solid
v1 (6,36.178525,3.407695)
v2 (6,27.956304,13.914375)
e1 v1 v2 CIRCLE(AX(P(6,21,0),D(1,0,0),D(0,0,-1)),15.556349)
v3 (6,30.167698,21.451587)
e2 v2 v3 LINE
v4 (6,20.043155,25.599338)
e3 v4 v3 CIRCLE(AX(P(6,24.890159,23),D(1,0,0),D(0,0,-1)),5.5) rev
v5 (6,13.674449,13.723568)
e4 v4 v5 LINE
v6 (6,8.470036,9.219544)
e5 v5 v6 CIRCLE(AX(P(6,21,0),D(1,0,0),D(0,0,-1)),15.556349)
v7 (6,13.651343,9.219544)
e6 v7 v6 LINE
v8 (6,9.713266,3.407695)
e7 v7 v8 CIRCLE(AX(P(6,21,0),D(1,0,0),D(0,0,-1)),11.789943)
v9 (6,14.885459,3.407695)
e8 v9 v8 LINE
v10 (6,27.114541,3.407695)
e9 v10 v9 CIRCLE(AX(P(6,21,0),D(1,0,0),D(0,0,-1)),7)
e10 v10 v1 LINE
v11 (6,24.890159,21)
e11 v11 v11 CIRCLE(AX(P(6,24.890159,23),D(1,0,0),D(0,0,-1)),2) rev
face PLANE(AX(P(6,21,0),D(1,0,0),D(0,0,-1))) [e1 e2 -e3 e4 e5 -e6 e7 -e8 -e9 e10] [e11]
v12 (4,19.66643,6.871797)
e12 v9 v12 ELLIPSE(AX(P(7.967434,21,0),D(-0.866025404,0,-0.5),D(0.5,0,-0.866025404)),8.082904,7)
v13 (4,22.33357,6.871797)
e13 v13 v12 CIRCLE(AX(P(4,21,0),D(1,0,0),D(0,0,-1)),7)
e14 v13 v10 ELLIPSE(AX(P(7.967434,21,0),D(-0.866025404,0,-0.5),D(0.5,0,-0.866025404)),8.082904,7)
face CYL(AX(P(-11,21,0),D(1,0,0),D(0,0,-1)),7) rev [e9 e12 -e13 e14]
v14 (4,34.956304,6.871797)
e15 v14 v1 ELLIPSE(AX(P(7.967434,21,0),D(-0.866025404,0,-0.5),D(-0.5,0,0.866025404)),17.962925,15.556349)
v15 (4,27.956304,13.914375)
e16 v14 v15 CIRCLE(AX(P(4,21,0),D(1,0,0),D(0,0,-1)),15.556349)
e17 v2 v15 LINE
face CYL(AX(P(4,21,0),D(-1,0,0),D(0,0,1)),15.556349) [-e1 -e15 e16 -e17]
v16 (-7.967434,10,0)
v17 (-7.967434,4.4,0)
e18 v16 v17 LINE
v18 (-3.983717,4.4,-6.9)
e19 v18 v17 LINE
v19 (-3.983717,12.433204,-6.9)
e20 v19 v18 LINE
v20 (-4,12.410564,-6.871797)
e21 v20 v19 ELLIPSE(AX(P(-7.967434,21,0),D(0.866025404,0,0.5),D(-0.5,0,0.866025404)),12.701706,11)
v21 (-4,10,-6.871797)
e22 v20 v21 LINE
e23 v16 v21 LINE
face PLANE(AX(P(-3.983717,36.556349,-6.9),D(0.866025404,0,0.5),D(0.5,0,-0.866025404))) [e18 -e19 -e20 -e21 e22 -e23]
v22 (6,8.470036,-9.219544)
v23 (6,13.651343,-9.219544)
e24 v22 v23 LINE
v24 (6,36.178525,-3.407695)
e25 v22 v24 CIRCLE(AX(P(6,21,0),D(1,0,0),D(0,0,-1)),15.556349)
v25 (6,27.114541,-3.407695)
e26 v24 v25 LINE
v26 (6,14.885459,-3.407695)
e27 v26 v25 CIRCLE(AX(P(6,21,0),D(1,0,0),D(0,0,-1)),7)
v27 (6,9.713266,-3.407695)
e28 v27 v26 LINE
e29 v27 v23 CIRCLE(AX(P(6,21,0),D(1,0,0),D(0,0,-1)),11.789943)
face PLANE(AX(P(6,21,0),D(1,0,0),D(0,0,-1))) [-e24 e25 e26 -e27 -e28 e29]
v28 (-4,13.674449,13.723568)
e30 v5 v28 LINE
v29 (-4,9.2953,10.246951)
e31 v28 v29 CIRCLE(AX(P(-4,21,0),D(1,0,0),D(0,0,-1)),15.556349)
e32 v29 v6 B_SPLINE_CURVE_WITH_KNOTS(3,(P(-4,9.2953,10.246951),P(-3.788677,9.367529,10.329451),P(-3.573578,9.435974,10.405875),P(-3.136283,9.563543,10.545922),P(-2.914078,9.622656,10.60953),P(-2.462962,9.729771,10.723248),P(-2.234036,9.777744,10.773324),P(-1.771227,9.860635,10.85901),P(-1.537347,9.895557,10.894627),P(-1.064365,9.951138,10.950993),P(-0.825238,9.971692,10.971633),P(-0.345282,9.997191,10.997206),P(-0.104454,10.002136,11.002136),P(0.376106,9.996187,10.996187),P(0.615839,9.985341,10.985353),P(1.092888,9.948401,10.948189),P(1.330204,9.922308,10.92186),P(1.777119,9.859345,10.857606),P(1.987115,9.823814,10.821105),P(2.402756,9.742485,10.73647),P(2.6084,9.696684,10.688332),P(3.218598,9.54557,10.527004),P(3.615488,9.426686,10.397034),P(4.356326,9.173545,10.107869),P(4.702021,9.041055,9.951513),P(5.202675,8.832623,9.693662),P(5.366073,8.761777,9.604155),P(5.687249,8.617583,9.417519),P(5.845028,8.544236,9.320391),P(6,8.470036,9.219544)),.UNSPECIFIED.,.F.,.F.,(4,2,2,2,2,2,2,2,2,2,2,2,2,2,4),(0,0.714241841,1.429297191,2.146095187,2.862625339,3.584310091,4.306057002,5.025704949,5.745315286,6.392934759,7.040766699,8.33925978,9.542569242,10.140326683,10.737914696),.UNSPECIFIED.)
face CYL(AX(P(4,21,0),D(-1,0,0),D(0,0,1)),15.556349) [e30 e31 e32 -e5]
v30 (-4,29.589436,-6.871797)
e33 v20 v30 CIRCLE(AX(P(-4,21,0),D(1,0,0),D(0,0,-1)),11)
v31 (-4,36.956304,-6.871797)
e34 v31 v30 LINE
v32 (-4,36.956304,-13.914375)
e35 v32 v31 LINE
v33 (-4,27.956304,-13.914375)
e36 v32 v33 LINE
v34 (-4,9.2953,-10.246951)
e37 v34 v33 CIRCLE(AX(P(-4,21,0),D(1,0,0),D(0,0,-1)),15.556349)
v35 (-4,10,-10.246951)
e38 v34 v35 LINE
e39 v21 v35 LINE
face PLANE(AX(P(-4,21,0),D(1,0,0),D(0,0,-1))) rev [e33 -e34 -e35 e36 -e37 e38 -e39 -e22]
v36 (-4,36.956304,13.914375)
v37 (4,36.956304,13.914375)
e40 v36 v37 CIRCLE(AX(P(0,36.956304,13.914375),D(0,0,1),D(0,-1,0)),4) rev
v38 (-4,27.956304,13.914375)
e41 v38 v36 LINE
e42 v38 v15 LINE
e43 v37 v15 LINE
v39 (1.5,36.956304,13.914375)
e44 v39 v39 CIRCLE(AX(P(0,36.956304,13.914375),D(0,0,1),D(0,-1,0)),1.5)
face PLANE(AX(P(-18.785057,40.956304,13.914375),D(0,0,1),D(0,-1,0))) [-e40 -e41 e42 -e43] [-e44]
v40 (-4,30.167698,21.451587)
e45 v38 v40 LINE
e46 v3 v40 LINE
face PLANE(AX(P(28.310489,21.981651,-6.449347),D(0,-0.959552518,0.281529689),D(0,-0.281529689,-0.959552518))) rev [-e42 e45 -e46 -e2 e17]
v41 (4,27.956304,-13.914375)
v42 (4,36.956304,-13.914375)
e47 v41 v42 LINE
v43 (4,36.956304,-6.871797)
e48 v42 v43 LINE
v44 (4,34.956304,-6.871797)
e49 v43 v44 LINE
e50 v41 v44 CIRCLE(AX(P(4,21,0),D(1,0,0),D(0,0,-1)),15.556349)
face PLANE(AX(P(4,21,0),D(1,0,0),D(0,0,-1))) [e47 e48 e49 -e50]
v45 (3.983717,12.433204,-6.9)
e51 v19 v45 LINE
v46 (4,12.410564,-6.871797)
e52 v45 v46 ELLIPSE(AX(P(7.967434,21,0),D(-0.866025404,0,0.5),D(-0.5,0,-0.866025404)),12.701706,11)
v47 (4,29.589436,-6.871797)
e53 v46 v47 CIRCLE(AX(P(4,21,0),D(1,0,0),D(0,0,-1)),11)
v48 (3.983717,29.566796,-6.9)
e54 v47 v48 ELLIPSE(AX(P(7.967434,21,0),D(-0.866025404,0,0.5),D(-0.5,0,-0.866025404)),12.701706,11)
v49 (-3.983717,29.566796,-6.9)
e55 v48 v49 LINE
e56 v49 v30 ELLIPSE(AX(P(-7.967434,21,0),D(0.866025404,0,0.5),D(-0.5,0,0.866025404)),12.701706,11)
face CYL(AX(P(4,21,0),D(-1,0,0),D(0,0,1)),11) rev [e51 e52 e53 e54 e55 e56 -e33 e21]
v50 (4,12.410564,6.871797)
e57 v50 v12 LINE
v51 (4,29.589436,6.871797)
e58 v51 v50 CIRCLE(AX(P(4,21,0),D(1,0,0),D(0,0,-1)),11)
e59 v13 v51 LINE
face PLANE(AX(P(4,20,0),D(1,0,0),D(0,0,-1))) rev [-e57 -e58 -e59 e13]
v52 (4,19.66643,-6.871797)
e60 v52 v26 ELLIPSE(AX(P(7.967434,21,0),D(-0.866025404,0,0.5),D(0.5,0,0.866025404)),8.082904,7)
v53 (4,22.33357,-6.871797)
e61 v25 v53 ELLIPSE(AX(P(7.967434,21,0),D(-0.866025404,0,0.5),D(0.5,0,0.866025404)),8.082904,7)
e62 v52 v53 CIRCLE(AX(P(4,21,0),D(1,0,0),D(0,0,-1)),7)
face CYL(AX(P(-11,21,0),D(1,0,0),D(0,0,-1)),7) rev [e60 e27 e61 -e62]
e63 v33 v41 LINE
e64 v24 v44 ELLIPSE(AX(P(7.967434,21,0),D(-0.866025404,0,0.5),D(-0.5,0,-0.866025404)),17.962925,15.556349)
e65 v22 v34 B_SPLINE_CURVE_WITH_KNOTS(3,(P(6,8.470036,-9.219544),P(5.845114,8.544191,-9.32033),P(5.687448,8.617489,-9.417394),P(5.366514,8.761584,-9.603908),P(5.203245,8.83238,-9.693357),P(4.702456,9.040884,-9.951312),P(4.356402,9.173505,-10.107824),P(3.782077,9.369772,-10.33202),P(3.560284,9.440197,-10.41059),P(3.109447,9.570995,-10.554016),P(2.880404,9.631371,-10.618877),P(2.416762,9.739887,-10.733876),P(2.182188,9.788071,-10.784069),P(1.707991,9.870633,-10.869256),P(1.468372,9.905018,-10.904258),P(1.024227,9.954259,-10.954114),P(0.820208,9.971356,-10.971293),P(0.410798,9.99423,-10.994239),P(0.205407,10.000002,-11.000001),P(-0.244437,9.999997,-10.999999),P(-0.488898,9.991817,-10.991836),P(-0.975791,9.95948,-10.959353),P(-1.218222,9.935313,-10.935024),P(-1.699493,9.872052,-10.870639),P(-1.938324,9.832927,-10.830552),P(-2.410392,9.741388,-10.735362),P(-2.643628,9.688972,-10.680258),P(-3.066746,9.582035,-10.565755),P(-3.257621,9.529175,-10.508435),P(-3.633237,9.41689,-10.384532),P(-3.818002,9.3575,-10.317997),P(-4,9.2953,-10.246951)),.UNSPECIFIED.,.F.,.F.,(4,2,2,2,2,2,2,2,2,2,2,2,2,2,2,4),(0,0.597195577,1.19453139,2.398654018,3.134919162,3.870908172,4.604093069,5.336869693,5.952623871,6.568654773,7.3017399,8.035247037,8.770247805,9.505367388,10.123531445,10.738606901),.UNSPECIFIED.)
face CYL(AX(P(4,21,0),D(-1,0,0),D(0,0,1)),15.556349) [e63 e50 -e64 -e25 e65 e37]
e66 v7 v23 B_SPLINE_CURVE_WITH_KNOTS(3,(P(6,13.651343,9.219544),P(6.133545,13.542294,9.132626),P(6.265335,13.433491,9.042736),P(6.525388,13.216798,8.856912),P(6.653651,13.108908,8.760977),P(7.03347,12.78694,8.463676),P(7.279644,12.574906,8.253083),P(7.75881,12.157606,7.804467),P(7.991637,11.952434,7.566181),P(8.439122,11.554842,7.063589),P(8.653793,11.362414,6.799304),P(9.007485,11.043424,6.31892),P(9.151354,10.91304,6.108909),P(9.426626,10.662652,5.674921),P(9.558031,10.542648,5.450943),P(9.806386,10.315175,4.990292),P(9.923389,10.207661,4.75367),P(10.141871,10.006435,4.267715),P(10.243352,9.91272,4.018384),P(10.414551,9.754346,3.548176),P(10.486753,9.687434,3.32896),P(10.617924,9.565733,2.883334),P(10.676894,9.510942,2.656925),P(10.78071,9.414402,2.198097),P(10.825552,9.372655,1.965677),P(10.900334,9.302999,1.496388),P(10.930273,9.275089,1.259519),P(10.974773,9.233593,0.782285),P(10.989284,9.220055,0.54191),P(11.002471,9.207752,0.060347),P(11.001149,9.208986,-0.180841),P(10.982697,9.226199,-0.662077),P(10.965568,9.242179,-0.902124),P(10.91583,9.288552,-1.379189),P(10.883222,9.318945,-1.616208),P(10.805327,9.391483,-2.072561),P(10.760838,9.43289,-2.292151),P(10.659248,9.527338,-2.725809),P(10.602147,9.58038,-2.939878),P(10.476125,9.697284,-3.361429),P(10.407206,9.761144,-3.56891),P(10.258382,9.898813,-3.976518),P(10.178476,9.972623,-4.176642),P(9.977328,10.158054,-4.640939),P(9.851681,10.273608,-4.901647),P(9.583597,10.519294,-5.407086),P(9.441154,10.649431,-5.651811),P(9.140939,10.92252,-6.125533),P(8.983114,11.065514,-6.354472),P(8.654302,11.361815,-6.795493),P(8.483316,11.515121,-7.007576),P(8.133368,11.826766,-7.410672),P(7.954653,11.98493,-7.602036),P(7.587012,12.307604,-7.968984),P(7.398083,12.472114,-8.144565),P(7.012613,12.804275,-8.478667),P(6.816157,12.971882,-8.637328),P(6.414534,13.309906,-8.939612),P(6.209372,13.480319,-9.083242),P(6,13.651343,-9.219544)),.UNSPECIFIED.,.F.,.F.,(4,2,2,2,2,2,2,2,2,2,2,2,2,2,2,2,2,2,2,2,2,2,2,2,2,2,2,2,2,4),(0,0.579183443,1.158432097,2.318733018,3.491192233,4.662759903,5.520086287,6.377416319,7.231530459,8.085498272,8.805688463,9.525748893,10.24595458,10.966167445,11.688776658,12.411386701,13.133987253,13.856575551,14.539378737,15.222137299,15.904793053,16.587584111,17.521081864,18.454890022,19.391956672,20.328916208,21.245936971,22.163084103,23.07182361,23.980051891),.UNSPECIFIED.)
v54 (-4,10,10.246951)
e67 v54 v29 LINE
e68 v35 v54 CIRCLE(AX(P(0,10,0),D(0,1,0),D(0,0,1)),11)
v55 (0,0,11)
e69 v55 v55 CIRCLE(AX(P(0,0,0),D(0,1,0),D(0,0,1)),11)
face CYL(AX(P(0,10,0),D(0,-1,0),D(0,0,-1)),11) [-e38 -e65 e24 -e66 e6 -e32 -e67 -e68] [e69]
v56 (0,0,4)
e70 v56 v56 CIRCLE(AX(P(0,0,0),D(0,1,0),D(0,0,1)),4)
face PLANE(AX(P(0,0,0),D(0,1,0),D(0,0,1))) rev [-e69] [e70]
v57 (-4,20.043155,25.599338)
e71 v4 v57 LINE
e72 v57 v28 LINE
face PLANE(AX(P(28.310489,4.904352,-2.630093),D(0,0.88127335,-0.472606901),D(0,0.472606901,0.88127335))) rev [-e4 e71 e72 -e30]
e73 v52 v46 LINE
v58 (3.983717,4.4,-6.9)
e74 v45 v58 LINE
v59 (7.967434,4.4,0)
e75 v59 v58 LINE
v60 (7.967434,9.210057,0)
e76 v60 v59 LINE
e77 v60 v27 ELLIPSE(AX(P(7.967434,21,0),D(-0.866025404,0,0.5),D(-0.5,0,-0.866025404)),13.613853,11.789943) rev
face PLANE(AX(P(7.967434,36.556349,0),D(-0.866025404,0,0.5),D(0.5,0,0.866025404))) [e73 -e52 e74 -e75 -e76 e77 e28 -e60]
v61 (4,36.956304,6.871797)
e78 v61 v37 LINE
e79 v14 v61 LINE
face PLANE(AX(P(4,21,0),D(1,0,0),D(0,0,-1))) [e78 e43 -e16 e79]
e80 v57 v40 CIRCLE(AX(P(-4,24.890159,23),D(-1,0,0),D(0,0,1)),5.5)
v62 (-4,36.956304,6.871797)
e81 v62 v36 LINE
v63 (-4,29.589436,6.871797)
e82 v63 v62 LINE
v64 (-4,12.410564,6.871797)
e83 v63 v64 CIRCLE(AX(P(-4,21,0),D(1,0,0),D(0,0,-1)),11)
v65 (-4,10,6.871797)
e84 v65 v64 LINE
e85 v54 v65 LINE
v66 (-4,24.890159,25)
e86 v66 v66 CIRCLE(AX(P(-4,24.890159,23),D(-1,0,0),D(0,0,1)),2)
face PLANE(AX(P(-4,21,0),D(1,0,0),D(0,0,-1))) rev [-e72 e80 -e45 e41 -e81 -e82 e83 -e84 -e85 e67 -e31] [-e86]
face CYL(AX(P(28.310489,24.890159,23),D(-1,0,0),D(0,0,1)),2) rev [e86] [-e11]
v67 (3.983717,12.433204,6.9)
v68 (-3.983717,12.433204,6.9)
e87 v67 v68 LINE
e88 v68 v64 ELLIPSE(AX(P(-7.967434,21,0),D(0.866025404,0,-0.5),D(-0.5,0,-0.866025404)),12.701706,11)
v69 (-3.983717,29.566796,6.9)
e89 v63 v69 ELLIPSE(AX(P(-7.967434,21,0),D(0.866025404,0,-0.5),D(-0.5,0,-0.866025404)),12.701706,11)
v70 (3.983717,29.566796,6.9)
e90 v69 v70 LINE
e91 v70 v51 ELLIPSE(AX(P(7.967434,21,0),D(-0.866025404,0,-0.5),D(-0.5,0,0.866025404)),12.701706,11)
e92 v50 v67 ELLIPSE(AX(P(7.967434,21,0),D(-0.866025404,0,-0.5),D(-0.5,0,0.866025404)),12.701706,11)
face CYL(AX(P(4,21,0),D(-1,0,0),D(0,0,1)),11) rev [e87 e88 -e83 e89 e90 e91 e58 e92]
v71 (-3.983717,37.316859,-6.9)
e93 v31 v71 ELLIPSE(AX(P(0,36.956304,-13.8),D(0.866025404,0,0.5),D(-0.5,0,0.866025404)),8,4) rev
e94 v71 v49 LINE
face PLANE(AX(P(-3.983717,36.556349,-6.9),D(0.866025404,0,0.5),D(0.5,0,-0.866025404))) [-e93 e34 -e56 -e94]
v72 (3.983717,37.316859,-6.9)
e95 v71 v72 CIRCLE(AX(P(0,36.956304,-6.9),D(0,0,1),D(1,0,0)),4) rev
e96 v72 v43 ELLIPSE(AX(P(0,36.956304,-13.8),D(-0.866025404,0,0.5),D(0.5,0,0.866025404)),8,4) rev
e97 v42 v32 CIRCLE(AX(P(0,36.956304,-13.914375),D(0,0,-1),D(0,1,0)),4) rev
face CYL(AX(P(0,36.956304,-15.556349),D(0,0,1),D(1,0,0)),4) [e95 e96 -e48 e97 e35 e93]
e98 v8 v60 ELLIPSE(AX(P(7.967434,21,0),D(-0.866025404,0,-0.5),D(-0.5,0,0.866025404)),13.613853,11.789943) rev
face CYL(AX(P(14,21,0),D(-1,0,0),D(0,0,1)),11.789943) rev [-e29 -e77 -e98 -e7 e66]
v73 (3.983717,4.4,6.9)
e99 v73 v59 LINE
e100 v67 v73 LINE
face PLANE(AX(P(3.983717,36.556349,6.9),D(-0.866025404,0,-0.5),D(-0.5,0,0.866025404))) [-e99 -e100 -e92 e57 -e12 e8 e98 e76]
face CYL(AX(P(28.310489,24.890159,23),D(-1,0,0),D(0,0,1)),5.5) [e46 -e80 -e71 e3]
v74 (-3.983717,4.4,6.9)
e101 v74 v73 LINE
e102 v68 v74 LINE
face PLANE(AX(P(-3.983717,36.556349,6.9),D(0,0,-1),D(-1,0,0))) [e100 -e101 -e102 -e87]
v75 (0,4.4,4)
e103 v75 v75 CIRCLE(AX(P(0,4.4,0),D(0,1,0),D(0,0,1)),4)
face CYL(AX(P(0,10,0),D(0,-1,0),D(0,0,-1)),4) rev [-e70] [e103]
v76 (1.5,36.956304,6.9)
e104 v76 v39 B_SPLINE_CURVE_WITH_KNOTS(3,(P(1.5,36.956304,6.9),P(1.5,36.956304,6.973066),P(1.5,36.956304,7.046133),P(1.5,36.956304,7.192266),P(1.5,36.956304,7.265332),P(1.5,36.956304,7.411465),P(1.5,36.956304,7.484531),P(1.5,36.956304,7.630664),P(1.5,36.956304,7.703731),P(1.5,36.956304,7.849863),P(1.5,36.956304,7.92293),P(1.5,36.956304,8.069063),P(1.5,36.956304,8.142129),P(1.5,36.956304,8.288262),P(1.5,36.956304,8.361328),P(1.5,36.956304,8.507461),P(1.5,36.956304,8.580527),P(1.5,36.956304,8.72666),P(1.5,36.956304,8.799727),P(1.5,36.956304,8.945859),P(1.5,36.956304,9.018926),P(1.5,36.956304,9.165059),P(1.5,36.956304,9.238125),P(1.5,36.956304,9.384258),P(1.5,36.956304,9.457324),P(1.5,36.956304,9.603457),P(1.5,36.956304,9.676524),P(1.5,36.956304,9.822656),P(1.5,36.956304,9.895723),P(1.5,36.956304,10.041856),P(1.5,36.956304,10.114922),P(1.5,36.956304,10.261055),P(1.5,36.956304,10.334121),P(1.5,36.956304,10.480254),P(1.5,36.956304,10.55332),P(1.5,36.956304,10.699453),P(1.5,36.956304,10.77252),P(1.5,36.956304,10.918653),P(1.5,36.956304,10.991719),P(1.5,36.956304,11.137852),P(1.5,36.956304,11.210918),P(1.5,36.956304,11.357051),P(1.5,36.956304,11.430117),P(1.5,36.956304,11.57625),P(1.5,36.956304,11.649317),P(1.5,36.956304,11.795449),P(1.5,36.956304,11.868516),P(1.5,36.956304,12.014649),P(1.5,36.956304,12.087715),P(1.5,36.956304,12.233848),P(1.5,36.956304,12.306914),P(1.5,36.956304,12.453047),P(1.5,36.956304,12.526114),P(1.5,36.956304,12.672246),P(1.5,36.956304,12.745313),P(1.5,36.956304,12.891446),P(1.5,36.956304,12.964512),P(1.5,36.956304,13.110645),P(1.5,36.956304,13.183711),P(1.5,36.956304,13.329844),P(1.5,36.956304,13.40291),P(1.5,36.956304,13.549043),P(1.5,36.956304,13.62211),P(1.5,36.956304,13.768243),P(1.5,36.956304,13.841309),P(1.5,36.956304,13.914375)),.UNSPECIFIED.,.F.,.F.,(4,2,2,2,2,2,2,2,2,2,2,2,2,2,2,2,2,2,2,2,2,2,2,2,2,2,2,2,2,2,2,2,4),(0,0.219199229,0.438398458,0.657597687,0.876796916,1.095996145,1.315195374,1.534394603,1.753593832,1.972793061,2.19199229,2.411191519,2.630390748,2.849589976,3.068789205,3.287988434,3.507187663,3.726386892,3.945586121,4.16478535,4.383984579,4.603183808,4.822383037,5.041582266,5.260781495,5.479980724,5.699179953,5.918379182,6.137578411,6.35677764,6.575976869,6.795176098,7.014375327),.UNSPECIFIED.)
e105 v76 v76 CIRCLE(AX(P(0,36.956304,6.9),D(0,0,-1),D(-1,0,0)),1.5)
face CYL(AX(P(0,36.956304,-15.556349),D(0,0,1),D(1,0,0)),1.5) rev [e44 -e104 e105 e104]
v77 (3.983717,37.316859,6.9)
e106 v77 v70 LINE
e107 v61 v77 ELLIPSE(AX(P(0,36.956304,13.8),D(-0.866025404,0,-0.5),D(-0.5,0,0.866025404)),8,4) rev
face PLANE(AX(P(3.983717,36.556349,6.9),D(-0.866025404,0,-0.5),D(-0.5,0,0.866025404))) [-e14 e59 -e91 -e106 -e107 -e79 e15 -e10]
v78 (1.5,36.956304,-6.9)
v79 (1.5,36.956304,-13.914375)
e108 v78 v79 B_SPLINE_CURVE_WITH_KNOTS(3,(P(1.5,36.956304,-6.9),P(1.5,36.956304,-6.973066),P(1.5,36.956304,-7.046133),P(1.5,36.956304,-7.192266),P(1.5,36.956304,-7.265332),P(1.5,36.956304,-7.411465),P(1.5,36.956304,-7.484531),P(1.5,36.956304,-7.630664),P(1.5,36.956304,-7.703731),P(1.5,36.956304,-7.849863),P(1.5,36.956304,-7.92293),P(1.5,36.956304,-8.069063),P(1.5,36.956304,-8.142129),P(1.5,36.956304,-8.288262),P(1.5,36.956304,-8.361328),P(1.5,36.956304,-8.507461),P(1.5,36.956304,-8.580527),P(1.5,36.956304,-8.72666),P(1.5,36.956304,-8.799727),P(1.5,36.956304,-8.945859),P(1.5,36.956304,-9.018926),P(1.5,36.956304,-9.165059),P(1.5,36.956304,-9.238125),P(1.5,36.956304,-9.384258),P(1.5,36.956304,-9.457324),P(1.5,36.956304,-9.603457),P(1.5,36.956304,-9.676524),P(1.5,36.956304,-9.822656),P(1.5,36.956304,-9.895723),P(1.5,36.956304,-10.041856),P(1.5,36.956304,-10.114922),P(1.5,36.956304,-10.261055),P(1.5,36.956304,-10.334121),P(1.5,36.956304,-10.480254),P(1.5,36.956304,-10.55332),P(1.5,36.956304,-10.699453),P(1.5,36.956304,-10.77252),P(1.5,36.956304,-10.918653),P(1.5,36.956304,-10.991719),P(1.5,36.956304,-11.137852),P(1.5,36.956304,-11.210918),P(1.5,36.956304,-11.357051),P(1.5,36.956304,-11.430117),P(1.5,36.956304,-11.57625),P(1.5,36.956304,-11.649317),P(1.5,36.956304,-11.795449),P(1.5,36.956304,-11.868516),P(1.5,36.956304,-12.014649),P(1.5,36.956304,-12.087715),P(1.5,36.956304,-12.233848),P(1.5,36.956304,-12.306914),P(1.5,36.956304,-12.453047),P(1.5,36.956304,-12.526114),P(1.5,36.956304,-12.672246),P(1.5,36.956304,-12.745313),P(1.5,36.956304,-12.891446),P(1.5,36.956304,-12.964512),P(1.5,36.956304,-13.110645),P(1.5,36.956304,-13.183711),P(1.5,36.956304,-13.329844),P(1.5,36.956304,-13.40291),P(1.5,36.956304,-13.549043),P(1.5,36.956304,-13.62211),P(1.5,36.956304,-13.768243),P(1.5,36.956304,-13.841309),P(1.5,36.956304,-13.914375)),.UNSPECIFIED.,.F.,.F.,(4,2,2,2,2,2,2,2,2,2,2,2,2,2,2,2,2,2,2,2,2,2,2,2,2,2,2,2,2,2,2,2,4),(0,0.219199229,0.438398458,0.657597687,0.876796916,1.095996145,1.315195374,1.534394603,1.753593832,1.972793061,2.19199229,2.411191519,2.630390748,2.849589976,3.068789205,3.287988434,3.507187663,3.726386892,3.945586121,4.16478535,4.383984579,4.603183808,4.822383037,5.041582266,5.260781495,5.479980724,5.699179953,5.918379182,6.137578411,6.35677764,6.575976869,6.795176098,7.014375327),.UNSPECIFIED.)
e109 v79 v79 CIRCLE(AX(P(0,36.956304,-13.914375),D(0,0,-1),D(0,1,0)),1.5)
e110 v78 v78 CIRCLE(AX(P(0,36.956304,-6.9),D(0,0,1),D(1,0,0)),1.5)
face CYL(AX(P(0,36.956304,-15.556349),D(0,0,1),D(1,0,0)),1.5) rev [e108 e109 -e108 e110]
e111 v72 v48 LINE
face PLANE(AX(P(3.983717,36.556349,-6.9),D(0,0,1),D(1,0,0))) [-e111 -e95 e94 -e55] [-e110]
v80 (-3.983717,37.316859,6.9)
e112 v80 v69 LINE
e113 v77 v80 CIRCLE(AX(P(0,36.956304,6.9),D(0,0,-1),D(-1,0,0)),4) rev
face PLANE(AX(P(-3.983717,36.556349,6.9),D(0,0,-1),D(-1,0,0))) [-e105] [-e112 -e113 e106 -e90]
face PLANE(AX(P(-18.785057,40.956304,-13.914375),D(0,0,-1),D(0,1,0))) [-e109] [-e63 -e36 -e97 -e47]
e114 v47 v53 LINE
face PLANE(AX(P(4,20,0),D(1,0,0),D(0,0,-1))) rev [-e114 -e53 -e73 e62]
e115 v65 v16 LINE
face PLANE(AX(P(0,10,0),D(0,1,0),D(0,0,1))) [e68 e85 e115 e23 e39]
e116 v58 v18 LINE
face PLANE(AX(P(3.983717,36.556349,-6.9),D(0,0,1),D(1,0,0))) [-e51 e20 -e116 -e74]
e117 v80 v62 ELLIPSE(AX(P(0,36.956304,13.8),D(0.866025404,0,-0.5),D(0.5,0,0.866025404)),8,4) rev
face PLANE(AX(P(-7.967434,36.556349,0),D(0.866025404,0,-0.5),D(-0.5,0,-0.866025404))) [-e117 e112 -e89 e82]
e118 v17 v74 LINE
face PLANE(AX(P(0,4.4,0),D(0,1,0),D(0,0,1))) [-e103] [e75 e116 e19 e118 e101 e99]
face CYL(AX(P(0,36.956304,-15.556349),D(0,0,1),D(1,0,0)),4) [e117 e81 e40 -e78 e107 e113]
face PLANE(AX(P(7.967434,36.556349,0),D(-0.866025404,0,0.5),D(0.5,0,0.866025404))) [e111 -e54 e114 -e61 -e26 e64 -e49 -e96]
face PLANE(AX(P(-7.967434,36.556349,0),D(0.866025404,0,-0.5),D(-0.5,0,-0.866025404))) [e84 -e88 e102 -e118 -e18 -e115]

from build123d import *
from build123d.topology import SkipClean

# Parameters (mm, degrees)
SKETCH1_R               = 11
SKETCH1_R_2             = 4
BOSS_EXTRUDE1_DEPTH     = 10
SKETCH3_R               = 15.556349186
SKETCH3_R_2             = 11
BOSS_EXTRUDE2_DEPTH     = 4
CUT_EXTRUDE1_DEPTH      = 33.68393631
CUT_EXTRUDE1_DEPTH_BACK = 5.6
BOSS_EXTRUDE4_DEPTH     = 10
BOSS_EXTRUDE3_DEPTH     = 8
BOSS_EXTRUDE5_START     = 4
SKETCH3_2_R             = 15.556349186
SKETCH3_2_R_2           = 11
BOSS_EXTRUDE5_DEPTH     = 2
CUT_EXTRUDE2_DEPTH      = 37.349590584
CUT_EXTRUDE2_DEPTH_BACK = 5.6
CUT_EXTRUDE3_DEPTH      = 47.993816701
CUT_EXTRUDE3_DEPTH_BACK = 47.993816701
SKETCH13_R              = 7
CUT_EXTRUDE5_DEPTH      = 52.642447787
CUT_EXTRUDE5_DEPTH_BACK = 52.642447787
SKETCH14_R              = 1.5
SKETCH15_R              = 11.789942891
CUT_EXTRUDE6_DEPTH      = 8
BOSS_EXTRUDE6_REACH     = 48.308
SKETCH16_R              = 2


with BuildPart() as part:
    # Sketch1 → Boss-Extrude1 (new body)
    with BuildSketch(Plane(origin=(0, 0, 0), x_dir=(1, 0, 0), z_dir=(0, 1, 0))):
        with Locations(Location((0, 0, 0), (0, 0, 270))):
            Circle(SKETCH1_R)
        with Locations(Location((0, 0, 0), (0, 0, 270))):
            Circle(SKETCH1_R_2, mode=Mode.SUBTRACT)
    extrude(amount=BOSS_EXTRUDE1_DEPTH)

    # Sketch3 → Boss-Extrude2 (add, symmetric)
    with BuildSketch(Plane(origin=(0, 0, 0), x_dir=(0, 0, -1), z_dir=(1, 0, 0))):
        with Locations((0, 21)):
            Circle(SKETCH3_R)
        with Locations(Location((0, 21, 0), (0, 0, 270))):
            Circle(SKETCH3_R_2, mode=Mode.SUBTRACT)
    extrude(amount=BOSS_EXTRUDE2_DEPTH, both=True)

    # Sketch2 → Cut-Extrude1 (cut, two sides: drawn at the far end of the back side and taken through both)
    with BuildSketch(Plane(origin=(0, 10, 0), x_dir=(1, 0, 0), z_dir=(0, 1, 0)).offset(-CUT_EXTRUDE1_DEPTH_BACK)):
        Polygon((3.983716857, 6.9), (-3.983716857, 6.9), (-7.967433715, 0), (-3.983716857, -6.9), (3.983716857, -6.9), (7.967433715, 0), align=None)
    extrude(amount=CUT_EXTRUDE1_DEPTH + CUT_EXTRUDE1_DEPTH_BACK, mode=Mode.SUBTRACT)

    # Sketch9 → Boss-Extrude4 (add)
    with BuildSketch(Plane(origin=(0, 10, 0), x_dir=(1, 0, 0), z_dir=(0, 1, 0))):
        with BuildLine():
            ThreePointArc((4, -10.246950766), (11, 0), (4, 10.246950766))
            Line((4, 10.246950766), (4, 6.87179677))
            Line((4, 6.87179677), (7.967433715, 0))
            Line((7.967433715, 0), (4, -6.87179677))
            Line((4, -6.87179677), (4, -10.246950766))
        make_face()
    extrude(amount=BOSS_EXTRUDE4_DEPTH)

    # Sketch4 → Boss-Extrude3 (add)
    with BuildSketch(Plane(origin=(4, 0, 0), x_dir=(0, 0, -1), z_dir=(1, 0, 0))):
        with BuildLine():
            Line((-6.87179677, 34.956303563), (-6.87179677, 40.956303563))
            Line((-6.87179677, 40.956303563), (-13.914375327, 40.956303563))
            Line((-13.914375327, 40.956303563), (-13.914375327, 27.956303563))
            ThreePointArc((-13.914375327, 27.956303563), (-10.966596446, 32.033302425), (-6.87179677, 34.956303563))
        make_face()
        with BuildLine():
            Line((6.87179677, 34.956303563), (6.87179677, 40.956303563))
            Line((6.87179677, 40.956303563), (13.914375327, 40.956303563))
            Line((13.914375327, 40.956303563), (13.914375327, 27.956303563))
            ThreePointArc((13.914375327, 27.956303563), (10.966596446, 32.033302425), (6.87179677, 34.956303563))
        make_face()
    extrude(amount=-BOSS_EXTRUDE3_DEPTH)

    # Sketch3<2> → Boss-Extrude5 (add)
    # profile 1 of 2: a face of its own
    with SkipClean():  # the faces are left unmerged after this step: merging them gives an invalid solid
        with BuildSketch(Plane(origin=(0, 0, 0), x_dir=(0, 0, -1), z_dir=(1, 0, 0)).offset(BOSS_EXTRUDE5_START)):
            with Locations((0, 21)):
                Circle(SKETCH3_2_R)
            with Locations((0, 21)):
                Circle(SKETCH3_2_R_2, mode=Mode.SUBTRACT)
        # profile 2 of 2: a face of its own
        with BuildSketch(Plane(origin=(0, 0, 0), x_dir=(0, 0, -1), z_dir=(1, 0, 0)).offset(BOSS_EXTRUDE5_START)):
            with Locations((0, 21)):
                Circle(SKETCH3_2_R_2)
        extrude(amount=BOSS_EXTRUDE5_DEPTH)
    add(part.part.scale(1), mode=Mode.REPLACE)  # the faces are merged on a copy

    # Sketch2<2> → Cut-Extrude2 (cut, two sides: drawn at the far end of the back side and taken through both)
    with BuildSketch(Plane(origin=(0, 10, 0), x_dir=(1, 0, 0), z_dir=(0, 1, 0)).offset(-CUT_EXTRUDE2_DEPTH_BACK)):
        Polygon((3.983716857, 6.9), (-3.983716857, 6.9), (-7.967433715, 0), (-3.983716857, -6.9), (3.983716857, -6.9), (7.967433715, 0), align=None)
    extrude(amount=CUT_EXTRUDE2_DEPTH + CUT_EXTRUDE2_DEPTH_BACK, mode=Mode.SUBTRACT)

    # Sketch13 → Cut-Extrude3 (cut, two sides: drawn at the far end of the back side and taken through both)
    with BuildSketch(Plane(origin=(6, 0, 0), x_dir=(0, 0, -1), z_dir=(1, 0, 0)).offset(-CUT_EXTRUDE3_DEPTH_BACK)):
        with Locations((0, 21)):
            Circle(SKETCH13_R)
    extrude(amount=CUT_EXTRUDE3_DEPTH + CUT_EXTRUDE3_DEPTH_BACK, mode=Mode.SUBTRACT)

    # Sketch14 → Cut-Extrude5 (cut, two sides: drawn at the far end of the back side and taken through both)
    with BuildSketch(Plane.XY.offset(13.914375327).offset(-CUT_EXTRUDE5_DEPTH_BACK)):
        with Locations((0, 36.956303563)):
            Circle(SKETCH14_R)
        with BuildLine():
            Line((-4, 36.956303563), (-4, 43.473651887))
            Line((-4, 43.473651887), (4, 43.473651887))
            Line((4, 43.473651887), (4, 36.956303563))
            ThreePointArc((4, 36.956303563), (0, 40.956303563), (-4, 36.956303563))
        make_face()
    extrude(amount=CUT_EXTRUDE5_DEPTH + CUT_EXTRUDE5_DEPTH_BACK, mode=Mode.SUBTRACT)

    # Sketch15 → Cut-Extrude6 (cut)
    with BuildSketch(Plane(origin=(6, 0, 0), x_dir=(0, 0, -1), z_dir=(1, 0, 0))):
        with Locations((0, 21)):
            Circle(SKETCH15_R)
    extrude(amount=CUT_EXTRUDE6_DEPTH, mode=Mode.SUBTRACT)

    # Boss-Extrude6: up to this face of the body (flat: up to its plane)
    boss_extrude6_end = Plane(part.part.faces().sort_by_distance((6, 22.369931635, -9.227258585))[0])
    # Sketch16 → Boss-Extrude6 (add, up to the picked face)
    with BuildSketch(Plane.ZY.offset(4), mode=Mode.PRIVATE) as boss_extrude6_sk1:
        with BuildLine():
            Line((13.723567505, 13.674449171), (25.599337953, 20.043155389))
            ThreePointArc((25.599337953, 20.043155389), (28.089469493, 26.975176866), (21.451586712, 30.167697662))
            Line((21.451586712, 30.167697662), (13.914375327, 27.956303563))
            ThreePointArc((13.914375327, 27.956303563), (15.554961016, 20.792183273), (13.723567505, 13.674449171))
        make_face()
        with Locations((23, 24.890158814)):
            Circle(SKETCH16_R, mode=Mode.SUBTRACT)
    boss_extrude6_tool1 = split(extrude(boss_extrude6_sk1.sketch, amount=-BOSS_EXTRUDE6_REACH, mode=Mode.PRIVATE), bisect_by=boss_extrude6_end, keep=Keep.BOTH, mode=Mode.PRIVATE)
    add(boss_extrude6_tool1.solids().sort_by(Axis((-4, 23.412763, 20.74002), (1, 0, 0)))[0])


solid = part.part
